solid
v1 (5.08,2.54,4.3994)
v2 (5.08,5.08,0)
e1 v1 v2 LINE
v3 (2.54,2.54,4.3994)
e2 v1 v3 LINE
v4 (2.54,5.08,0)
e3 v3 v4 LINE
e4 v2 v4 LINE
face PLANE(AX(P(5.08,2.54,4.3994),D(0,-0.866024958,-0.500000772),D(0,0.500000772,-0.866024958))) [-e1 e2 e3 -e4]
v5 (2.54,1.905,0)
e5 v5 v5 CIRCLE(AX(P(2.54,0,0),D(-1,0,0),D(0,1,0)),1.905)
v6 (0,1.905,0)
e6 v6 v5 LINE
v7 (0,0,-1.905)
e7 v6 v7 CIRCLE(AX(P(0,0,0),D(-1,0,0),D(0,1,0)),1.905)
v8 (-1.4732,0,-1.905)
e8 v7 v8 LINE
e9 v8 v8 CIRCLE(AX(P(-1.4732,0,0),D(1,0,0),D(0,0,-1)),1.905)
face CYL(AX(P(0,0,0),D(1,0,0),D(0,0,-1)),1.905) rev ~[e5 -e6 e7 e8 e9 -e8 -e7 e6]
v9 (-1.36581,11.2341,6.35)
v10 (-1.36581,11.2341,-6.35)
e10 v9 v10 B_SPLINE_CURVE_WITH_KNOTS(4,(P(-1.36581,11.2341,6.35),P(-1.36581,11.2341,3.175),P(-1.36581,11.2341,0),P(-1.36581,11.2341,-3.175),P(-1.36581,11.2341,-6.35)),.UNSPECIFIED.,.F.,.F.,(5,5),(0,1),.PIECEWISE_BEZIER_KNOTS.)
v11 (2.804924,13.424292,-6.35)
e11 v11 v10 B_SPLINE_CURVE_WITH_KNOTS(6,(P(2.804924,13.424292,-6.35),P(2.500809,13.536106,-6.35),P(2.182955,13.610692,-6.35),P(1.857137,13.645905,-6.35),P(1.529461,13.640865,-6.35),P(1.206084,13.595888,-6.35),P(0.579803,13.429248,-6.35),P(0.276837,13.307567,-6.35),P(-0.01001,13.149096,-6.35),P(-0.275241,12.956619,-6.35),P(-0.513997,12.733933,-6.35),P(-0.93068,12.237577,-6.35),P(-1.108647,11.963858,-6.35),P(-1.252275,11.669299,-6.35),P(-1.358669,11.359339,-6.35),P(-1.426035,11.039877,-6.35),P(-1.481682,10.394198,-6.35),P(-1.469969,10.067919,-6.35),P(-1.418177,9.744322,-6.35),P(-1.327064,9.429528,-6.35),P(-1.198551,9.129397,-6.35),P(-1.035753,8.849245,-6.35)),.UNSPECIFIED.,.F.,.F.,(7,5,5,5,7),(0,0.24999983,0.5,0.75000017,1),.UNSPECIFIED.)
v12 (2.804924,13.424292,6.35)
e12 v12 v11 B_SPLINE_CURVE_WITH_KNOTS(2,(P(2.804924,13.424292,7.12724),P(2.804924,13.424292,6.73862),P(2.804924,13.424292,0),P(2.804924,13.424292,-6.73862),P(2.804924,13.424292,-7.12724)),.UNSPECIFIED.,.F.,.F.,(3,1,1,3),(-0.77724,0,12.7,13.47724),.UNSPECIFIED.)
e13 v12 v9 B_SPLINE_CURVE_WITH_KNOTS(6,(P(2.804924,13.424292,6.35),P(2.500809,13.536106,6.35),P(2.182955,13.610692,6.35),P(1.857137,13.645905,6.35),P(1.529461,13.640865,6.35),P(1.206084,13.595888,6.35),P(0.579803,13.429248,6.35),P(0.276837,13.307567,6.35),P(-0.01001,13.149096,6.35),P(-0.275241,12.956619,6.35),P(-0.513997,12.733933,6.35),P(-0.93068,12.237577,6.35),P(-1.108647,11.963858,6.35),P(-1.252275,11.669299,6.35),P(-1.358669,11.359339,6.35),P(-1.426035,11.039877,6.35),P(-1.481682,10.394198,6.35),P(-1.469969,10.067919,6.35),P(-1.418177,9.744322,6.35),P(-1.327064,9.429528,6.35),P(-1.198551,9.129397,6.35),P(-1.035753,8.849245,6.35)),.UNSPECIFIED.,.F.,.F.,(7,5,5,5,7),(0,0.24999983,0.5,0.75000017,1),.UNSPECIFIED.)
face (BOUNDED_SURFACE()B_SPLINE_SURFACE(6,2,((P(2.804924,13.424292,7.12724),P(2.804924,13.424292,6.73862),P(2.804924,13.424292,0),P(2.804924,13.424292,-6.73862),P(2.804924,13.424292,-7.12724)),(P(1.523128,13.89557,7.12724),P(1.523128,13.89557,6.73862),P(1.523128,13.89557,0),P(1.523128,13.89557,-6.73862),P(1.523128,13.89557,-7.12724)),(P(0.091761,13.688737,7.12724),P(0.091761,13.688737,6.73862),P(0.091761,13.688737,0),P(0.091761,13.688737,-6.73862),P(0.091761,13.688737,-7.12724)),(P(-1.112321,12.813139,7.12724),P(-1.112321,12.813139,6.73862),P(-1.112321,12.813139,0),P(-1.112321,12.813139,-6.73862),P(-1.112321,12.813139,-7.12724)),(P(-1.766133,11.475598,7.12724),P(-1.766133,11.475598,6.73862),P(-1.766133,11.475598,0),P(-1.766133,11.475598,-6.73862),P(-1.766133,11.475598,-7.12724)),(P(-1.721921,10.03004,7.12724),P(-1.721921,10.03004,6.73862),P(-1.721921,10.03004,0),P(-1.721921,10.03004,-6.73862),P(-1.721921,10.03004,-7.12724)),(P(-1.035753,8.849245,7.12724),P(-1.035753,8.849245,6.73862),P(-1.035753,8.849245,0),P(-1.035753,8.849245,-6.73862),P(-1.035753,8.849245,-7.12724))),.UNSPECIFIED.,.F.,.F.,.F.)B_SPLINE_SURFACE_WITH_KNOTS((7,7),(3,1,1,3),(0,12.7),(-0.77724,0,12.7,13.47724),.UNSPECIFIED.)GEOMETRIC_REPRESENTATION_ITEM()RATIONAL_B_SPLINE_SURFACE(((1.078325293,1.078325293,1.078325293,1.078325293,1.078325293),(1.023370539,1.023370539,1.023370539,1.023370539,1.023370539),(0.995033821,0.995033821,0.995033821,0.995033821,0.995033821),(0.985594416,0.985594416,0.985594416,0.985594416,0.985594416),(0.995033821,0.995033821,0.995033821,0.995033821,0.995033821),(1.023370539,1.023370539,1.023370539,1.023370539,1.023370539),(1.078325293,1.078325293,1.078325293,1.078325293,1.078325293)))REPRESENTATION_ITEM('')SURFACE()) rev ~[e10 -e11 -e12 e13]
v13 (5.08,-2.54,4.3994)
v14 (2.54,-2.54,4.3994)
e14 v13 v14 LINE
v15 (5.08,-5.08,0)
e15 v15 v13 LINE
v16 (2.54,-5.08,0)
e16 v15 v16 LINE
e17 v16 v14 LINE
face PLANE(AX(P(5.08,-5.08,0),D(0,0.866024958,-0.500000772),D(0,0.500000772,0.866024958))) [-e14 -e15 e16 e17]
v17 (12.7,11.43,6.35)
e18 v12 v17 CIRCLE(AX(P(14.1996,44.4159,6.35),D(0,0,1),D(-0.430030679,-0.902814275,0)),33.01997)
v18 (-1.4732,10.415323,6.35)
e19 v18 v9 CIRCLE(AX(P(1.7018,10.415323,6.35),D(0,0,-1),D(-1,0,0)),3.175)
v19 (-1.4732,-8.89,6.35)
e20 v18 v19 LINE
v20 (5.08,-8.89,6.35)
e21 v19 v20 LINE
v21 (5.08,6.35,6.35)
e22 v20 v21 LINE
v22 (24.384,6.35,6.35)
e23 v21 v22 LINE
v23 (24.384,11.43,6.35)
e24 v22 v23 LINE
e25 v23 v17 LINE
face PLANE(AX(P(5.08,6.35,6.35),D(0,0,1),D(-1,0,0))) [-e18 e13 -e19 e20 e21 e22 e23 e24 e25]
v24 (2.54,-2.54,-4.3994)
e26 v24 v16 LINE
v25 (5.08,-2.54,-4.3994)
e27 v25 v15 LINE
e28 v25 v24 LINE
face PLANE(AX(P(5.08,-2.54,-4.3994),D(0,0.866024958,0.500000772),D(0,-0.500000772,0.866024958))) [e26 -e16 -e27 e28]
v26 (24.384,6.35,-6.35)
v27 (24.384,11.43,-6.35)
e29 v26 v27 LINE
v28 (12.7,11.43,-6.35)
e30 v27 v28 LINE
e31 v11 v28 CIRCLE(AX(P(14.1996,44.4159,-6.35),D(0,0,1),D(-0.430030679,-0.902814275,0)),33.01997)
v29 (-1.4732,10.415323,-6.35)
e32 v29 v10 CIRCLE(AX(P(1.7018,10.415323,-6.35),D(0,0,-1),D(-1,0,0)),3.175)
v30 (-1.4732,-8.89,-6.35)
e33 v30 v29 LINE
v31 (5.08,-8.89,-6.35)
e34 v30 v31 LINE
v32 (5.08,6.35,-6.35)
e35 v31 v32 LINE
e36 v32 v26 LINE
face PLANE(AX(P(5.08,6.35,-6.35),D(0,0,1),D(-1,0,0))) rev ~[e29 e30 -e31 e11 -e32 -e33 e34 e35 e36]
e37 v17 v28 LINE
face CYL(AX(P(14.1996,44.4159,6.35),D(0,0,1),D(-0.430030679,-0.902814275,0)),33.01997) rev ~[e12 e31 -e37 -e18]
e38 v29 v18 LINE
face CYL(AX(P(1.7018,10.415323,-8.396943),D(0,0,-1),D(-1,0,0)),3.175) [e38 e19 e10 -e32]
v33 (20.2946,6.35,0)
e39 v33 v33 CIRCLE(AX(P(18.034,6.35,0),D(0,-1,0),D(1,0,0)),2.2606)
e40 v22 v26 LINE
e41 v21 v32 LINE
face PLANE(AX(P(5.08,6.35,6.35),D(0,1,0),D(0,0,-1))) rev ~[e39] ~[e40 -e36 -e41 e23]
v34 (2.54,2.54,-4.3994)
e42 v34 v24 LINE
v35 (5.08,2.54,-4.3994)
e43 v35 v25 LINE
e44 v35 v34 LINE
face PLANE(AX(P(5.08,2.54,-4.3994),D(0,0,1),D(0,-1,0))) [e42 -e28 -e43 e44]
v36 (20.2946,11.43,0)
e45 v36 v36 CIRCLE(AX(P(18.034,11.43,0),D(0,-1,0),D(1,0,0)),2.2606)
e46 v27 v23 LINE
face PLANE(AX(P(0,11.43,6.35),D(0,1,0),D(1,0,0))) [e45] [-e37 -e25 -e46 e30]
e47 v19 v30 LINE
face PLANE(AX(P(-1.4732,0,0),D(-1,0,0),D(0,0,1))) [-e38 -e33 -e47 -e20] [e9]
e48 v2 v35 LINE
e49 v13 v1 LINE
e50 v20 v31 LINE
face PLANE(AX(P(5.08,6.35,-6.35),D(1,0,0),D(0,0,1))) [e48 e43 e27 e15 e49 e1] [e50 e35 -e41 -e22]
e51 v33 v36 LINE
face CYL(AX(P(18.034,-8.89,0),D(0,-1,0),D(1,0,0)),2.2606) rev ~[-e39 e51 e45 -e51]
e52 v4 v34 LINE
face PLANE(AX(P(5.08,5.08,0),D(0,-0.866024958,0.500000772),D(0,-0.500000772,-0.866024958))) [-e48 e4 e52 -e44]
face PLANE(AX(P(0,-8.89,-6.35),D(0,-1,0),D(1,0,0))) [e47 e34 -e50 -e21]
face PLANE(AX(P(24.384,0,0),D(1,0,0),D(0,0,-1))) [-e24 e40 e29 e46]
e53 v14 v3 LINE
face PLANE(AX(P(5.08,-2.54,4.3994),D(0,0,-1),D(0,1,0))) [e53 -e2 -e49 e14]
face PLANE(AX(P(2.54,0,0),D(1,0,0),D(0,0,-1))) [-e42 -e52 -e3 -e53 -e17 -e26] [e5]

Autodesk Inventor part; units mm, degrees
ref_plane "YZ Plane" through (0, 0, 0) normal (1, 0, 0) x (0, 1, 0)
ref_plane "XZ Plane" through (0, 0, 0) normal (0, 1, 0) x (-1, 0, 0)
ref_plane "XY Plane" through (0, 0, 0) normal (0, 0, 1) x (1, 0, 0)
sketch "Sketch1" plane through (0, 0, 0) normal (1, 0, 0) x (0, 1, 0)
  circle A0 centre (0, 0) radius 1.905
  line L0 (0, 0) -> (0, -6.35)
  line L1 (0, 0) -> (0, 6.35)
  line L2 (0, 6.35) -> (-6.35, 6.35)
  line L3 (0, -6.35) -> (6.35, -6.35)
  line L4 (-6.35, 6.35) -> (6.35, 6.35)
  line L5 (6.35, 6.35) -> (6.35, -6.35)
  line L6 (6.35, -6.35) -> (-6.35, -6.35)
  line L7 (-6.35, -6.35) -> (-6.35, 6.35)
  dimension "d0" = 3.81
  dimension "d2" = 6.35
  dimension "d3" = 6.35
  dimension "d4" = 6.35
  dimension "d5" = 6.35
extrude "Extrusion1" add sketch "Sketch1" along normal blind 5.08 contours A0 L1 L4 L5 L3 L0 | A0 L0 L6 L7 L2 L1
sketch "Sketch2" plane through (5.08, 0, 0) normal (1, 0, 0) x (0, 0, -1)
  point P0 (0, 0)
sketch "Sketch3" plane through (5.08, 0, 0) normal (1, 0, 0) x (0, 0, -1)
  line L0 (0, 0) -> (0, -5.08)
  arc A0 (0, -5.08) -> (0, 0) centre (-4.3994, -2.54) ccw
  line L1 (4.3994, -2.54) -> (0, -5.08)
  line L2 (0, -5.08) -> (-4.3994, -2.54)
  line L3 (-4.3994, 2.54) -> (0, 5.08)
  line L4 (4.3994, 2.54) -> (4.3994, -2.54)
  line L5 (-4.3994, -2.54) -> (-4.3994, 2.54)
  line L6 (0, 5.08) -> (4.3994, 2.54)
  dimension "d8" = 5.08
extrude "Extrusion2" cut sketch "Sketch3" against normal blind 2.54 contours A0 L0 | L2 L5 L3 L6 L4 L1
sketch "Sketch4" plane through (0, -6.35, -6.35) normal (0, -1, 0) x (1, 0, 0)
  line L0 (0, 12.7) -> (5.08, 12.7) projected
  line L1 (0, 0) -> (5.08, 0) projected
  line L2 (5.08, 12.7) -> (0, 12.7)
  line L3 (0, 12.7) -> (0, 0)
  line L4 (0, 0) -> (5.08, 0)
  line L5 (5.08, 0) -> (5.08, 12.7)
  point P0 (0, 6.35)
extrude "Extrusion3" add sketch "Sketch4" along normal blind 2.54
sketch "Sketch5" plane through (0, 6.35, 6.35) normal (0, 1, 0) x (1, 0, 0)
  line L0 (5.08, 0) -> (0, 0) projected
  line L1 (5.08, 12.7) -> (5.08, 0) projected
  line L2 (0, 0) -> (5.08, 0)
  line L3 (5.08, 0) -> (5.08, 12.7)
  line L4 (5.08, 12.7) -> (0, 12.7)
  line L5 (0, 12.7) -> (0, 0)
  point P0 (0, 6.35)
extrude "Extrusion4" add sketch "Sketch5" along normal blind 5.08
sketch "Sketch6" plane through (5.08, 0, 0) normal (1, 0, 0) x (0, 0, -1)
  line L0 (-6.35, -8.89) -> (-6.35, 11.43) projected
  line L1 (-6.35, 11.43) -> (-6.35, 6.35)
  line L2 (-6.35, -8.89) -> (-6.35, -6.35)
  line L3 (6.35, 11.43) -> (-6.35, 11.43) projected
  line L4 (-6.35, 6.35) -> (6.35, 6.35)
  line L5 (6.35, 6.35) -> (6.35, 11.43)
  line L6 (6.35, 11.43) -> (-6.35, 11.43)
  line L7 (-6.35, 11.43) -> (-6.35, 6.35)
  line L8 (6.35, -8.89) -> (-6.35, -8.89) projected
  line L9 (-6.35, -6.35) -> (6.35, -6.35)
  line L10 (6.35, -6.35) -> (6.35, -8.89)
  line L11 (6.35, -8.89) -> (-6.35, -8.89)
  line L12 (-6.35, -8.89) -> (-6.35, -6.35)
  point P0 (0, 0)
  dimension "d15" = 5.08
  dimension "d16" = 2.54
extrude "Extrusion5" add sketch "Sketch6" along normal blind 19.304
sketch "Sketch7" plane through (0, -8.89, -6.35) normal (0, -1, 0) x (1, 0, 0)
  line L0 (24.384, 0) -> (24.384, 12.7) projected
  line L1 (24.384, 6.35) -> (18.034, 6.35)
  circle A0 centre (18.034, 6.35) radius 2.2606
  point P0 (0, 6.35)
  dimension "d19" = 6.35
  dimension "d20" = 4.5212
extrude "Extrusion6" cut sketch "Sketch7" against normal blind 63.5
sketch "Sketch8" plane through (0, -8.89, 6.35) normal (0, 0, 1) x (1, 0, 0)
  line L0 (0, 0) -> (24.384, 0) projected
  line L1 (5.08, 2.54) -> (24.384, 2.54) projected
  line L2 (24.384, 0) -> (5.08, 0)
  line L3 (5.08, 0) -> (5.08, 2.54)
  line L4 (5.08, 2.54) -> (24.384, 2.54)
  line L5 (24.384, 2.54) -> (24.384, 0)
  point P0 (0, 8.89)
extrude "Extrusion7" cut sketch "Sketch8" against normal blind 25.4
sketch "Sketch10" plane through (0, -8.89, 6.35) normal (0, 0, 1) x (1, 0, 0)
  line L0 (5.08, 15.24) -> (0, 15.24)
  line L1 (0, 0) -> (0, 20.32) projected
  line L2 (0, 15.24) -> (0, 20.32)
  line L3 (0, 20.32) -> (-3.175, 20.32)
  arc A0 (0, 15.24) -> (-3.175, 20.32) centre (-9.8202, 12.6345) ccw
  line L4 (0, 20.32) -> (0, 23.495)
  arc A1 (-3.175, 20.32) -> (0, 23.495) centre (-8.5941, 28.9141) ccw
  line L5 (0, 20.32) -> (12.7, 20.32)
  line L6 (0, 20.32) -> (24.384, 20.32) projected
  arc A2 (0, 23.495) -> (12.7, 20.32) centre (14.1996, 53.3059) ccw
  point P0 (0, 8.89)
  dimension "d25" = 3.175
  dimension "d26" = 10.16
  dimension "d27" = 3.175
  dimension "d28" = 10.16
  dimension "d29" = 12.7
  dimension "d30" = 33.02
extrude "Extrusion8" add sketch "Sketch10" against normal up to surface (12.7 mm away)
fillet "Fillet1" radius 3.175 2 edges at (0, 14.605, 0) (-3.175, 11.43, 0)
sketch "Sketch11" plane through (0, 0, 0) normal (-1, 0, 0) x (0, 0, 1)
  line L0 (6.35, -8.89) -> (-6.35, -8.89) projected
  line L1 (-6.35, 8.8491) -> (-6.35, 13.6192) projected
  line L2 (6.35, -8.89) -> (-6.35, -8.89)
  line L3 (-6.35, -8.89) -> (-6.35, 11.2341)
  line L4 (-6.35, 11.2341) -> (6.35, 11.2341)
  line L5 (6.35, 11.2341) -> (6.35, -8.89)
  point P0 (0, 0)
  point P1 (-6.35, 13.4242)
extrude "Extrusion9" add sketch "Sketch11" along normal blind 1.4732
fillet "Fillet2" radius 3.175 1 edges at (-1.4732, 11.2341, 0)
sketch "Sketch12" plane through (0, 0, 0) normal (1, 0, 0) x (0, 0, -1)
  circle A0 centre (0, 0) radius 1.905
extrude "Extrusion10" cut sketch "Sketch12" against normal blind 18.9357
properties part number "printed piston fitting wings"
